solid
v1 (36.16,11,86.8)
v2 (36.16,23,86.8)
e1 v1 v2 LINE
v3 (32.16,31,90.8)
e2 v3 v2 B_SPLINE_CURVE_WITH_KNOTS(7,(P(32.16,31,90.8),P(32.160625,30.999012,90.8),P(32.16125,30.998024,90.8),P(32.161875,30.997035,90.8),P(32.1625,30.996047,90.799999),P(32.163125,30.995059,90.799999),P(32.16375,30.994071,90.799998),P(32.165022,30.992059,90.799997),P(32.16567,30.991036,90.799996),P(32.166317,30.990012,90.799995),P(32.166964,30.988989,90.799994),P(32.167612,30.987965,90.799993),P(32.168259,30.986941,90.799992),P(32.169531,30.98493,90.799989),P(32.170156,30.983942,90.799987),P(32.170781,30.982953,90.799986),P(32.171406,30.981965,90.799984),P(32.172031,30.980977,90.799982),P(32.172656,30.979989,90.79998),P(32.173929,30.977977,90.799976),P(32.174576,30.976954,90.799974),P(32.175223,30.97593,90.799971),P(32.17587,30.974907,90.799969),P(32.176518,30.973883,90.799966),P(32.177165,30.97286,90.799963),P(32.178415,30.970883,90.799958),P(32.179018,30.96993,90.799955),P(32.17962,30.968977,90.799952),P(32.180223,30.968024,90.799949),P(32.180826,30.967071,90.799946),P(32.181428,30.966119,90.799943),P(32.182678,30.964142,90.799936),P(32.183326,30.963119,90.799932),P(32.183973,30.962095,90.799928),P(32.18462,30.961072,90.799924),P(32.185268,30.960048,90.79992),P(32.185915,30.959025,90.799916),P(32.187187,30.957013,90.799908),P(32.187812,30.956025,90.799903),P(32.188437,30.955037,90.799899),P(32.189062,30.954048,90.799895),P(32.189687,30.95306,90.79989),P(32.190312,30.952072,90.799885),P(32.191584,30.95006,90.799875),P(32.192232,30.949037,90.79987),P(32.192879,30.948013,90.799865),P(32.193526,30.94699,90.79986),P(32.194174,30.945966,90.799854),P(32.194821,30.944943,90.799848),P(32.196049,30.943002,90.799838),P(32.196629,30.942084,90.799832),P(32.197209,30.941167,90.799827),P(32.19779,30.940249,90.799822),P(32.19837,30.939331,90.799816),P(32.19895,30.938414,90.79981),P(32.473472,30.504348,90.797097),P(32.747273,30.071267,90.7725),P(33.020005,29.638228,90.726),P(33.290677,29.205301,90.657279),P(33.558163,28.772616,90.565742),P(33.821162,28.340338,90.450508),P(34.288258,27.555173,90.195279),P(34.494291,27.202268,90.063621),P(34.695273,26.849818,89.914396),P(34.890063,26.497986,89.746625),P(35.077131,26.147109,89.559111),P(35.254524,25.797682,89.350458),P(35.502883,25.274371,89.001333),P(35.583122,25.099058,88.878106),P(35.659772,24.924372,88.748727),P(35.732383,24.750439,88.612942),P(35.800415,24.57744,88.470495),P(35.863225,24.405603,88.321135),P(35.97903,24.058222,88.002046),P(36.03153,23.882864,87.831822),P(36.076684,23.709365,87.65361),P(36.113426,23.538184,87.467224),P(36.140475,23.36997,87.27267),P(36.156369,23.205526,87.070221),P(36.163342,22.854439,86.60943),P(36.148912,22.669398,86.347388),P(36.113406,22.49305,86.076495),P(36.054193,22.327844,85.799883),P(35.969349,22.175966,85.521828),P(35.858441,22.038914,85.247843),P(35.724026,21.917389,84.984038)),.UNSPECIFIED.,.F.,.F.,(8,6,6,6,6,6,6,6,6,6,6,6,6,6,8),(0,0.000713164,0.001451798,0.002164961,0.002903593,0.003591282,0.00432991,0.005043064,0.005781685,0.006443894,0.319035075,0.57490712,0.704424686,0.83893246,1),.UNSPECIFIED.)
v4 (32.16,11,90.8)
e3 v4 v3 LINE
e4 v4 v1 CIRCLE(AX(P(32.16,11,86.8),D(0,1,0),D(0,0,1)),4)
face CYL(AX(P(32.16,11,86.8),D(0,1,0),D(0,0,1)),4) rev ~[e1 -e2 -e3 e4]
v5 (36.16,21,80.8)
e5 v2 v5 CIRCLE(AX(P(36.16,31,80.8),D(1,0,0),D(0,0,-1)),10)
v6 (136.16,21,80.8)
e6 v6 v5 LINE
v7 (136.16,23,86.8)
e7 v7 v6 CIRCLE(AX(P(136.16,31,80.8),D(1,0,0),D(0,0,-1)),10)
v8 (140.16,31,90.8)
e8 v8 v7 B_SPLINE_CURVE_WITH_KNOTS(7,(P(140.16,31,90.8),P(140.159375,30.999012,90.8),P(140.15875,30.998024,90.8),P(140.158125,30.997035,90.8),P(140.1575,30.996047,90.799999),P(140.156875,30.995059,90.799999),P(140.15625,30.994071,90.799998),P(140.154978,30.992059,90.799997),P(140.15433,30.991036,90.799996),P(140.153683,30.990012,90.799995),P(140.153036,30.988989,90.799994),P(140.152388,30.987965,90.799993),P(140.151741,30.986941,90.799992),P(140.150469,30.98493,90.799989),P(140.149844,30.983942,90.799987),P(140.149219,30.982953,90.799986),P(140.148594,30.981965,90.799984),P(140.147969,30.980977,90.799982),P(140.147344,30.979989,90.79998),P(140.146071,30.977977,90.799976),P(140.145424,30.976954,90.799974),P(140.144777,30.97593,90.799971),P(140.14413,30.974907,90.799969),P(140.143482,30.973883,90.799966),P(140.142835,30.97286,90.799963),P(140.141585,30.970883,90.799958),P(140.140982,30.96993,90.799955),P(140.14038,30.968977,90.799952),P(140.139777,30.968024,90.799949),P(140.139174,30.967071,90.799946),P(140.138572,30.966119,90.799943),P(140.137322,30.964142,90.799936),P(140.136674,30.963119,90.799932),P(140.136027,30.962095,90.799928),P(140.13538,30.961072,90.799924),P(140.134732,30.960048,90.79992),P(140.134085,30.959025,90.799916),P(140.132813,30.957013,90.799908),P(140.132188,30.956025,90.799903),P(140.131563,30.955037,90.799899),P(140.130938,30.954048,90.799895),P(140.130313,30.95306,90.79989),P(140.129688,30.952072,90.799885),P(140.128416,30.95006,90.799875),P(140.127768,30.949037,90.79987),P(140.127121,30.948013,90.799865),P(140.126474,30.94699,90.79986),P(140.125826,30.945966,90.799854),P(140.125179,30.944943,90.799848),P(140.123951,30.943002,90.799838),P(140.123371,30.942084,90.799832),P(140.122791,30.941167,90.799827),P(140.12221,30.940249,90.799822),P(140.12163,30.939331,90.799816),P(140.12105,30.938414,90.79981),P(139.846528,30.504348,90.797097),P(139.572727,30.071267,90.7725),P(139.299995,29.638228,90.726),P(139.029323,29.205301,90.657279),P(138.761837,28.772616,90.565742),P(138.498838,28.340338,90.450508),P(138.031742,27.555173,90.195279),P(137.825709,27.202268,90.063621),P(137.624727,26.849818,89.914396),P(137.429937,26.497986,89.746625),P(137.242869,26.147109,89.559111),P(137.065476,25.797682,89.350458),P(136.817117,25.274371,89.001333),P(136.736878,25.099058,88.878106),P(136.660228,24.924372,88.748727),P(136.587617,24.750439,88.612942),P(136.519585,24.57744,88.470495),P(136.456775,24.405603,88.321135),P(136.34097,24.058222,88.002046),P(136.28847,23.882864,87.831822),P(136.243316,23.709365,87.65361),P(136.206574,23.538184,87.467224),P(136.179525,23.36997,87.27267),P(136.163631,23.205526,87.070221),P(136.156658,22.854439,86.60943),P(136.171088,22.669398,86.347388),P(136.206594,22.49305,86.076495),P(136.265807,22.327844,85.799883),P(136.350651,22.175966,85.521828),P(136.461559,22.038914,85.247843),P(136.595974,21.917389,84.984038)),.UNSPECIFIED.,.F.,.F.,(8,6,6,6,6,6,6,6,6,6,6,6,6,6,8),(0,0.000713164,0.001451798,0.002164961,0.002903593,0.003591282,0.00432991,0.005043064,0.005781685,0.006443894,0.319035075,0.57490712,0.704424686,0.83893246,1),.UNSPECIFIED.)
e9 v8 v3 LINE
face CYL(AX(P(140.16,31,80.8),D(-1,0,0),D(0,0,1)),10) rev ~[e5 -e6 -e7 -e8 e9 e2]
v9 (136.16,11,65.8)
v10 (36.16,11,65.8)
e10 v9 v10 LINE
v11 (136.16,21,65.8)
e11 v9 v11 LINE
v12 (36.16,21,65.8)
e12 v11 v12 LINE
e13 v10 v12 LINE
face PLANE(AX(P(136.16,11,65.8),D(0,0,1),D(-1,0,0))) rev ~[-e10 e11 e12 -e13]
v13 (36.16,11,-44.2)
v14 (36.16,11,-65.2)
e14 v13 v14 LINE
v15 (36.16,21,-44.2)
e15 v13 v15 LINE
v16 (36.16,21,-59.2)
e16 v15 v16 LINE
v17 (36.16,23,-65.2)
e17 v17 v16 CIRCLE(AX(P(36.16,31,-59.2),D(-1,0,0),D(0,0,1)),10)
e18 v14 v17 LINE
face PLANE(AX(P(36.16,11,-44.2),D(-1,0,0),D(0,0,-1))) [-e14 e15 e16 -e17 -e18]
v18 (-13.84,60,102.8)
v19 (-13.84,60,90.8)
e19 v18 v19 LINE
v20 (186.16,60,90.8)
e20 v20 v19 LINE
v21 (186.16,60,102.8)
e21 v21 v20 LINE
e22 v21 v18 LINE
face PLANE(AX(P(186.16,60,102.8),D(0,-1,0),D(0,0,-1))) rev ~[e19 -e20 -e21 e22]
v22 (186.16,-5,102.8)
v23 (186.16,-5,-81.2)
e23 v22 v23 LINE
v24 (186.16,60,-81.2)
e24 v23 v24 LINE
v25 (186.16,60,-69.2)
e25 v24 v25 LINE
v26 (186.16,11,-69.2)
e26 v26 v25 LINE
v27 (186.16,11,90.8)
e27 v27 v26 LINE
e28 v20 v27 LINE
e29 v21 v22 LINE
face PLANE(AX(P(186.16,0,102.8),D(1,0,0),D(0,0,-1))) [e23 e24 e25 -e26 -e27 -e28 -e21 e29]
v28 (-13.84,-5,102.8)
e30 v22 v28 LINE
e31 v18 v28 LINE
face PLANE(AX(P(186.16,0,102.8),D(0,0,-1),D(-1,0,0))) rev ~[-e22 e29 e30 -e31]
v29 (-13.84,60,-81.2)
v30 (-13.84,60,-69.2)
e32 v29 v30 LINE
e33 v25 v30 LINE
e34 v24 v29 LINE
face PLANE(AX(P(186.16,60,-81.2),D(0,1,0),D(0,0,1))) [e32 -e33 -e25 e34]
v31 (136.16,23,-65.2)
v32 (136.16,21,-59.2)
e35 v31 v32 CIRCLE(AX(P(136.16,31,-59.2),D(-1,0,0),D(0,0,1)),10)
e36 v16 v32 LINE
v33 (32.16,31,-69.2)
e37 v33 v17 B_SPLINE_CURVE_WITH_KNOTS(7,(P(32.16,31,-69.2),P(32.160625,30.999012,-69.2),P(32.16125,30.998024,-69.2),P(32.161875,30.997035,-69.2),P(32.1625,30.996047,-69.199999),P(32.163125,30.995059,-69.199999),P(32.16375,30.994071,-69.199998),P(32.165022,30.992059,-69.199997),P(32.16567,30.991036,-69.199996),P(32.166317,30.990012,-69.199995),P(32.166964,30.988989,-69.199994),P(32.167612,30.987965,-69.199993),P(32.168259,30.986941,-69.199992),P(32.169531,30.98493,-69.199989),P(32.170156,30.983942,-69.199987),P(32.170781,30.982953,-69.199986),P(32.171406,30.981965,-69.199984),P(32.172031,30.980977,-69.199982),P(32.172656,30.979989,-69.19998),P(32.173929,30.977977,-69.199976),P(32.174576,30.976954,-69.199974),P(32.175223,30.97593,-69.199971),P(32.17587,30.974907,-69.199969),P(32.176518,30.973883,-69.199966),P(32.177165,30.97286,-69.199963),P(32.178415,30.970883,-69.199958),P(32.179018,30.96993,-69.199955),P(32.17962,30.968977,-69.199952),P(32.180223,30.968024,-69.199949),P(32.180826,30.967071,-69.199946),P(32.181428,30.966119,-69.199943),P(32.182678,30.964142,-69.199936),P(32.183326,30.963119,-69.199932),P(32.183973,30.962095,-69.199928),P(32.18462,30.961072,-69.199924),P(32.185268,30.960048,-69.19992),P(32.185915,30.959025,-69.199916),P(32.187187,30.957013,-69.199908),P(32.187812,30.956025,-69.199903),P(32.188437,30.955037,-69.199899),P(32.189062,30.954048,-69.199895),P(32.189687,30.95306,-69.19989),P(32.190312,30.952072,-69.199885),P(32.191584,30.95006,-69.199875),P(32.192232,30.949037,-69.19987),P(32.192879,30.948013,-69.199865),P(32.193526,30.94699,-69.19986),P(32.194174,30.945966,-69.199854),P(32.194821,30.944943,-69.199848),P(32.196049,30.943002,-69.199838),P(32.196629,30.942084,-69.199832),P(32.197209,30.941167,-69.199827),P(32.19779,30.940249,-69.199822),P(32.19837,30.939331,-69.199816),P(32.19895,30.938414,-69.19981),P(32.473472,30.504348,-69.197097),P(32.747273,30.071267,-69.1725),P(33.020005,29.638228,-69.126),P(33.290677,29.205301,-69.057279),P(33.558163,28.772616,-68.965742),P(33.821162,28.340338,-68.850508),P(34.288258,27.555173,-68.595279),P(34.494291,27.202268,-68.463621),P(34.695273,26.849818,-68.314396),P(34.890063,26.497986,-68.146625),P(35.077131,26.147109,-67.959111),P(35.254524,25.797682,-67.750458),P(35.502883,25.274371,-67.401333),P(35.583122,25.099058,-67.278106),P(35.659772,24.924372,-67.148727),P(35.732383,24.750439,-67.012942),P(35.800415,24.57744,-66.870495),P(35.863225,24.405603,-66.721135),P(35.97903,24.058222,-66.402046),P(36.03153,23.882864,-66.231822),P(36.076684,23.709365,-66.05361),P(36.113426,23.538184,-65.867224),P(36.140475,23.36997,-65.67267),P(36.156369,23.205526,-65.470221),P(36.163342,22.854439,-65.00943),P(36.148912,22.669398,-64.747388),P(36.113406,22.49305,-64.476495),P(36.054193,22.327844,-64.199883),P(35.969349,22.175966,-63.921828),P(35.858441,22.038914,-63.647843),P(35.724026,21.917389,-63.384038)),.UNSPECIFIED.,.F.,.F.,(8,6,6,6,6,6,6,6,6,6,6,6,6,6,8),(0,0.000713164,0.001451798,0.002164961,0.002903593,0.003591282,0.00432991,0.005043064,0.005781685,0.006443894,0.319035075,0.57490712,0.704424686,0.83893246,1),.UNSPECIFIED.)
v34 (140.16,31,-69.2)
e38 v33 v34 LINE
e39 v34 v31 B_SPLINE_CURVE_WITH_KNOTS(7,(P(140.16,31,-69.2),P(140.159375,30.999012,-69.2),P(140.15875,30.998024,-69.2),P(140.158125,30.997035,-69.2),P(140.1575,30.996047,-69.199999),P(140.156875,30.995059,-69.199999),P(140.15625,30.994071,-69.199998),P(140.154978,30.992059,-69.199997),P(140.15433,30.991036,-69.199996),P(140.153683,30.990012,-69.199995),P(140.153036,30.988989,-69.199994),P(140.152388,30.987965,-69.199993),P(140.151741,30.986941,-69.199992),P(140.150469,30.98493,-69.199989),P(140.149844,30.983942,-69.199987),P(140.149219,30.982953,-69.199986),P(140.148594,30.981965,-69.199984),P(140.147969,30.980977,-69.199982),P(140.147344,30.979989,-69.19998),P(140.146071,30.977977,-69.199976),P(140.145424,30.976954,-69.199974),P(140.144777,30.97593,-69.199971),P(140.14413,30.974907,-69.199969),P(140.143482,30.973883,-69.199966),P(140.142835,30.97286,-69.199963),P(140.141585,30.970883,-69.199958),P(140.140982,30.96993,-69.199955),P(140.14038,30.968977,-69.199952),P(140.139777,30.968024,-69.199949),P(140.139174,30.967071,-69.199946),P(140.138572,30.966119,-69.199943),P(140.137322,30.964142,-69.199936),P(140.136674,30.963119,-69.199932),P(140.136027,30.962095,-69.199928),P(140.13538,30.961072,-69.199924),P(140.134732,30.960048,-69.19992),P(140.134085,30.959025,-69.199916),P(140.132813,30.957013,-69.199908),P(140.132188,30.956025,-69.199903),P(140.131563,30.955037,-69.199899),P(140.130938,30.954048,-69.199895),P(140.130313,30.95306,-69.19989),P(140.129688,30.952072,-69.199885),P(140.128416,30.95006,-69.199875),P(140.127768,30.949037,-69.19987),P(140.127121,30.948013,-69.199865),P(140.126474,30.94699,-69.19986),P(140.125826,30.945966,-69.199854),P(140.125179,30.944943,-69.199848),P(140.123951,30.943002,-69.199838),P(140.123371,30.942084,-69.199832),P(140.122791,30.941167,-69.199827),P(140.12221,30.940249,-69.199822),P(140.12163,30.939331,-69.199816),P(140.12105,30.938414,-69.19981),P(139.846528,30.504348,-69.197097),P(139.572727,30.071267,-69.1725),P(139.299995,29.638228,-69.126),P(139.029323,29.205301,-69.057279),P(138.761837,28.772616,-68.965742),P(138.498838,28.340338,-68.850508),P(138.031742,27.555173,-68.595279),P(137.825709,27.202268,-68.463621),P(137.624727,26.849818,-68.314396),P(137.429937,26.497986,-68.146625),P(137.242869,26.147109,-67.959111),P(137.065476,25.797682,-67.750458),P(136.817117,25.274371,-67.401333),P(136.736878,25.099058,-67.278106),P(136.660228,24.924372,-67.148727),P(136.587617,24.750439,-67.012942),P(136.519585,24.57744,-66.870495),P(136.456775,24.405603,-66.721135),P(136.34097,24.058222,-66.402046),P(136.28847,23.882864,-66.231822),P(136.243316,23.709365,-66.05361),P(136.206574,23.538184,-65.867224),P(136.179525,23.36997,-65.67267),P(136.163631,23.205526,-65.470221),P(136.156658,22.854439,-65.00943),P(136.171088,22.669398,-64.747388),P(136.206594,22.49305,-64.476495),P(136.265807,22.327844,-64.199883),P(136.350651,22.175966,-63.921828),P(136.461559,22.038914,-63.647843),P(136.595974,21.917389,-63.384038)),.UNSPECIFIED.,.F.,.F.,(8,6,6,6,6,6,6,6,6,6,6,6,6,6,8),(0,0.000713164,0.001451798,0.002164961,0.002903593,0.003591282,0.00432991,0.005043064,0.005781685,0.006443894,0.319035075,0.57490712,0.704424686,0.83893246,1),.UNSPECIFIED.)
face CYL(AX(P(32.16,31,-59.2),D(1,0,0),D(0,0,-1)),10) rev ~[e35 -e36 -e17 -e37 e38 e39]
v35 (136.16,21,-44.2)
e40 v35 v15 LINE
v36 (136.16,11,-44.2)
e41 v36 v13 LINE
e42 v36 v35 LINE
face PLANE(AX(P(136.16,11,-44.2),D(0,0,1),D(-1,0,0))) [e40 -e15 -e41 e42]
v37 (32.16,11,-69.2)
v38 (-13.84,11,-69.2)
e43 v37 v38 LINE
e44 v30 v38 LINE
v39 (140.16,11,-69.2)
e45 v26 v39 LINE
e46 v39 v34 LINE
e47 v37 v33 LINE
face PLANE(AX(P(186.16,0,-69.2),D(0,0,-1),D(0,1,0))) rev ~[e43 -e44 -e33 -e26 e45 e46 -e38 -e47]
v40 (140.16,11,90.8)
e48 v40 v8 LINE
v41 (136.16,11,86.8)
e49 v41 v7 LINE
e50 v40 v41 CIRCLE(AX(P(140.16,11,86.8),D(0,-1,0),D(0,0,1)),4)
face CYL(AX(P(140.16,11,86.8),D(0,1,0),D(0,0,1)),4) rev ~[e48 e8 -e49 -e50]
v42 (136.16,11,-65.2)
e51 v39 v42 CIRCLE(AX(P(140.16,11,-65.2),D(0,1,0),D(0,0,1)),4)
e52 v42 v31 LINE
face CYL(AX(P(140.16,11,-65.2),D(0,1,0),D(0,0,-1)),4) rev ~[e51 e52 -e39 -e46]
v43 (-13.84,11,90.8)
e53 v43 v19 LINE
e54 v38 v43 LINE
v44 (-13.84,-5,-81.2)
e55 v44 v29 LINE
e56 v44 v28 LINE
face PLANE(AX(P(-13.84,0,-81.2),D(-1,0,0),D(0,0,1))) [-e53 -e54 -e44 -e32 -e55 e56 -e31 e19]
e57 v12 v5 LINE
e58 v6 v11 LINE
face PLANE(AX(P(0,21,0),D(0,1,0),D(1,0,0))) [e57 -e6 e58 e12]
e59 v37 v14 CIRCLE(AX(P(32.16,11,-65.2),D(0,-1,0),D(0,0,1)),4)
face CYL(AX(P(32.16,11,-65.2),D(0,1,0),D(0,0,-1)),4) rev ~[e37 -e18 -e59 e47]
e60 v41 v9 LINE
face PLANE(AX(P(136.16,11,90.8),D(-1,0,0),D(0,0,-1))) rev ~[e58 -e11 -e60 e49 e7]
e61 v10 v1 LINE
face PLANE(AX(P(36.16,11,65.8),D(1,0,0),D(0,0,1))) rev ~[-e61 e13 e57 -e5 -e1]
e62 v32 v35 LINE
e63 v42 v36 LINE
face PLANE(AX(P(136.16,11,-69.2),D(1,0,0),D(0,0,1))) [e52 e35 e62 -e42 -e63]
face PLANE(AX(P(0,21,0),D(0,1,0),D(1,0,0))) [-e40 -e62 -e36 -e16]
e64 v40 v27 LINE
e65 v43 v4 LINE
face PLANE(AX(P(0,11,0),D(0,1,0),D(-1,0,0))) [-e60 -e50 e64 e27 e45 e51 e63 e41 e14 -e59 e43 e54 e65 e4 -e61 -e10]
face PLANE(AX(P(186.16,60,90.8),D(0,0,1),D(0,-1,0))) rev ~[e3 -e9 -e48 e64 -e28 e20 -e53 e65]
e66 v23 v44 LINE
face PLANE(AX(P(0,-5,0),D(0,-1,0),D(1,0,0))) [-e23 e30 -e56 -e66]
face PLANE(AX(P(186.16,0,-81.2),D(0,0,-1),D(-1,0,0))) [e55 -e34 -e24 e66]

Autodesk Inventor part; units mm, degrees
ref_plane "YZ Plane" through (0, 0, 0) normal (1, 0, 0) x (0, 1, 0)
ref_plane "XZ Plane" through (0, 0, 0) normal (0, 1, 0) x (-1, 0, 0)
ref_plane "XY Plane" through (0, 0, 0) normal (0, 0, 1) x (1, 0, 0)
sketch "Sketch1" plane through (0, 0, 0) normal (0, 1, 0) x (-1, 0, 0)
  line L0 (13.84, 90.8) -> (-186.16, 90.8)
  line L1 (-186.16, 90.8) -> (-186.16, -69.2)
  line L2 (-186.16, -69.2) -> (13.84, -69.2)
  line L3 (13.84, -69.2) -> (13.84, 90.8)
  point P0 (0, 0)
  dimension "d0" = 160
  dimension "d1" = 200
extrude "Extrusion1" add sketch "Sketch1" along normal blind 11
sketch "Sketch2" plane through (186.16, 0, 90.8) normal (1, 0, 0) x (0, 0, -1)
  line L0 (0, 0) -> (0, 11) projected
  line L1 (0, 0) -> (-12, 0)
  line L2 (-12, 0) -> (-12, 60)
  line L3 (-12, 60) -> (0, 60)
  line L4 (0, 60) -> (0, 0)
  line L5 (160, 0) -> (160, 11) projected
  line L6 (160, 0) -> (172, 0)
  line L7 (172, 0) -> (172, 60)
  line L8 (172, 60) -> (160, 60)
  line L9 (160, 60) -> (160, 0)
  point P0 (90.8, 0)
  point P1 (0, 11)
  dimension "d4" = 60
  dimension "d5" = 60
  dimension "d6" = 12
  dimension "d17" = 12
extrude "Extrusion2" add sketch "Sketch2" against normal up to surface (200 mm away)
sketch "Sketch3" plane through (0, 0, 0) normal (0, -1, 0) x (1, 0, 0)
  line L0 (186.16, 102.8) -> (186.16, -81.2) projected
  line L1 (186.16, 102.8) -> (-13.84, 102.8) projected
  line L2 (-13.84, -81.2) -> (-13.84, 102.8) projected
  line L3 (186.16, -81.2) -> (-13.84, -81.2) projected
  point P0 (0, 0)
extrude "Extrusion3" add sketch "Sketch3" along normal blind 5
sketch "Sketch7" plane through (0, 11, 0) normal (0, 1, 0) x (1, 0, 0)
  line L0 (186.16, -90.8) -> (-13.84, -90.8) projected
  line L1 (36.16, -90.8) -> (136.16, -90.8)
  line L2 (136.16, -90.8) -> (136.16, -65.8)
  line L3 (136.16, -65.8) -> (36.16, -65.8)
  line L4 (36.16, -65.8) -> (36.16, -90.8)
  line L5 (186.16, 69.2) -> (-13.84, 69.2) projected
  line L6 (36.16, 69.2) -> (136.16, 69.2)
  line L7 (136.16, 69.2) -> (136.16, 44.2)
  line L8 (136.16, 44.2) -> (36.16, 44.2)
  line L9 (36.16, 44.2) -> (36.16, 69.2)
  line L10 (-13.84, 69.2) -> (-13.84, -90.8) projected
  line L11 (186.16, -90.8) -> (186.16, 69.2) projected
  point P0 (0, 0)
  point P1 (136.16, 56.7)
  dimension "d18" = 25
  dimension "d19" = 25
  dimension "d20" = 50
  dimension "d21" = 50
  dimension "d22" = 50
  dimension "d23" = 50
extrude "Extrusion6" add sketch "Sketch7" along normal blind 10 contours L0 L4 L3 L2 | L7 L8 L9 L5
fillet "Fillet1" radius 4 4 edges at (36.16, 16, -69.2) (36.16, 16, 90.8) (136.16, 16, -69.2) (136.16, 16, 90.8)
fillet "Fillet2" radius 10 4 edges at (138.16, 21, -69.2) (34.16, 21, -69.2) (34.16, 21, 90.8) (138.16, 21, 90.8)
sketch "Sketch8" plane through (-13.84, 11, 90.8) normal (-1, 0, 0) x (0, 0, 1)
  line L0 (-160, 0) -> (0, 0)
  line L1 (0, 0) -> (0, -19)
  line L2 (0, -19) -> (-160, -19)
  line L3 (-160, -19) -> (-160, 0)
  line L4 (-172, 49) -> (12, 49)
  line L5 (12, 49) -> (12, -16)
  line L6 (12, -16) -> (-172, -16)
  line L7 (-172, -16) -> (-172, 49)
  point P0 (-90.8, -11)
properties part number "Y_karetka" material "Aluminum 6061"
